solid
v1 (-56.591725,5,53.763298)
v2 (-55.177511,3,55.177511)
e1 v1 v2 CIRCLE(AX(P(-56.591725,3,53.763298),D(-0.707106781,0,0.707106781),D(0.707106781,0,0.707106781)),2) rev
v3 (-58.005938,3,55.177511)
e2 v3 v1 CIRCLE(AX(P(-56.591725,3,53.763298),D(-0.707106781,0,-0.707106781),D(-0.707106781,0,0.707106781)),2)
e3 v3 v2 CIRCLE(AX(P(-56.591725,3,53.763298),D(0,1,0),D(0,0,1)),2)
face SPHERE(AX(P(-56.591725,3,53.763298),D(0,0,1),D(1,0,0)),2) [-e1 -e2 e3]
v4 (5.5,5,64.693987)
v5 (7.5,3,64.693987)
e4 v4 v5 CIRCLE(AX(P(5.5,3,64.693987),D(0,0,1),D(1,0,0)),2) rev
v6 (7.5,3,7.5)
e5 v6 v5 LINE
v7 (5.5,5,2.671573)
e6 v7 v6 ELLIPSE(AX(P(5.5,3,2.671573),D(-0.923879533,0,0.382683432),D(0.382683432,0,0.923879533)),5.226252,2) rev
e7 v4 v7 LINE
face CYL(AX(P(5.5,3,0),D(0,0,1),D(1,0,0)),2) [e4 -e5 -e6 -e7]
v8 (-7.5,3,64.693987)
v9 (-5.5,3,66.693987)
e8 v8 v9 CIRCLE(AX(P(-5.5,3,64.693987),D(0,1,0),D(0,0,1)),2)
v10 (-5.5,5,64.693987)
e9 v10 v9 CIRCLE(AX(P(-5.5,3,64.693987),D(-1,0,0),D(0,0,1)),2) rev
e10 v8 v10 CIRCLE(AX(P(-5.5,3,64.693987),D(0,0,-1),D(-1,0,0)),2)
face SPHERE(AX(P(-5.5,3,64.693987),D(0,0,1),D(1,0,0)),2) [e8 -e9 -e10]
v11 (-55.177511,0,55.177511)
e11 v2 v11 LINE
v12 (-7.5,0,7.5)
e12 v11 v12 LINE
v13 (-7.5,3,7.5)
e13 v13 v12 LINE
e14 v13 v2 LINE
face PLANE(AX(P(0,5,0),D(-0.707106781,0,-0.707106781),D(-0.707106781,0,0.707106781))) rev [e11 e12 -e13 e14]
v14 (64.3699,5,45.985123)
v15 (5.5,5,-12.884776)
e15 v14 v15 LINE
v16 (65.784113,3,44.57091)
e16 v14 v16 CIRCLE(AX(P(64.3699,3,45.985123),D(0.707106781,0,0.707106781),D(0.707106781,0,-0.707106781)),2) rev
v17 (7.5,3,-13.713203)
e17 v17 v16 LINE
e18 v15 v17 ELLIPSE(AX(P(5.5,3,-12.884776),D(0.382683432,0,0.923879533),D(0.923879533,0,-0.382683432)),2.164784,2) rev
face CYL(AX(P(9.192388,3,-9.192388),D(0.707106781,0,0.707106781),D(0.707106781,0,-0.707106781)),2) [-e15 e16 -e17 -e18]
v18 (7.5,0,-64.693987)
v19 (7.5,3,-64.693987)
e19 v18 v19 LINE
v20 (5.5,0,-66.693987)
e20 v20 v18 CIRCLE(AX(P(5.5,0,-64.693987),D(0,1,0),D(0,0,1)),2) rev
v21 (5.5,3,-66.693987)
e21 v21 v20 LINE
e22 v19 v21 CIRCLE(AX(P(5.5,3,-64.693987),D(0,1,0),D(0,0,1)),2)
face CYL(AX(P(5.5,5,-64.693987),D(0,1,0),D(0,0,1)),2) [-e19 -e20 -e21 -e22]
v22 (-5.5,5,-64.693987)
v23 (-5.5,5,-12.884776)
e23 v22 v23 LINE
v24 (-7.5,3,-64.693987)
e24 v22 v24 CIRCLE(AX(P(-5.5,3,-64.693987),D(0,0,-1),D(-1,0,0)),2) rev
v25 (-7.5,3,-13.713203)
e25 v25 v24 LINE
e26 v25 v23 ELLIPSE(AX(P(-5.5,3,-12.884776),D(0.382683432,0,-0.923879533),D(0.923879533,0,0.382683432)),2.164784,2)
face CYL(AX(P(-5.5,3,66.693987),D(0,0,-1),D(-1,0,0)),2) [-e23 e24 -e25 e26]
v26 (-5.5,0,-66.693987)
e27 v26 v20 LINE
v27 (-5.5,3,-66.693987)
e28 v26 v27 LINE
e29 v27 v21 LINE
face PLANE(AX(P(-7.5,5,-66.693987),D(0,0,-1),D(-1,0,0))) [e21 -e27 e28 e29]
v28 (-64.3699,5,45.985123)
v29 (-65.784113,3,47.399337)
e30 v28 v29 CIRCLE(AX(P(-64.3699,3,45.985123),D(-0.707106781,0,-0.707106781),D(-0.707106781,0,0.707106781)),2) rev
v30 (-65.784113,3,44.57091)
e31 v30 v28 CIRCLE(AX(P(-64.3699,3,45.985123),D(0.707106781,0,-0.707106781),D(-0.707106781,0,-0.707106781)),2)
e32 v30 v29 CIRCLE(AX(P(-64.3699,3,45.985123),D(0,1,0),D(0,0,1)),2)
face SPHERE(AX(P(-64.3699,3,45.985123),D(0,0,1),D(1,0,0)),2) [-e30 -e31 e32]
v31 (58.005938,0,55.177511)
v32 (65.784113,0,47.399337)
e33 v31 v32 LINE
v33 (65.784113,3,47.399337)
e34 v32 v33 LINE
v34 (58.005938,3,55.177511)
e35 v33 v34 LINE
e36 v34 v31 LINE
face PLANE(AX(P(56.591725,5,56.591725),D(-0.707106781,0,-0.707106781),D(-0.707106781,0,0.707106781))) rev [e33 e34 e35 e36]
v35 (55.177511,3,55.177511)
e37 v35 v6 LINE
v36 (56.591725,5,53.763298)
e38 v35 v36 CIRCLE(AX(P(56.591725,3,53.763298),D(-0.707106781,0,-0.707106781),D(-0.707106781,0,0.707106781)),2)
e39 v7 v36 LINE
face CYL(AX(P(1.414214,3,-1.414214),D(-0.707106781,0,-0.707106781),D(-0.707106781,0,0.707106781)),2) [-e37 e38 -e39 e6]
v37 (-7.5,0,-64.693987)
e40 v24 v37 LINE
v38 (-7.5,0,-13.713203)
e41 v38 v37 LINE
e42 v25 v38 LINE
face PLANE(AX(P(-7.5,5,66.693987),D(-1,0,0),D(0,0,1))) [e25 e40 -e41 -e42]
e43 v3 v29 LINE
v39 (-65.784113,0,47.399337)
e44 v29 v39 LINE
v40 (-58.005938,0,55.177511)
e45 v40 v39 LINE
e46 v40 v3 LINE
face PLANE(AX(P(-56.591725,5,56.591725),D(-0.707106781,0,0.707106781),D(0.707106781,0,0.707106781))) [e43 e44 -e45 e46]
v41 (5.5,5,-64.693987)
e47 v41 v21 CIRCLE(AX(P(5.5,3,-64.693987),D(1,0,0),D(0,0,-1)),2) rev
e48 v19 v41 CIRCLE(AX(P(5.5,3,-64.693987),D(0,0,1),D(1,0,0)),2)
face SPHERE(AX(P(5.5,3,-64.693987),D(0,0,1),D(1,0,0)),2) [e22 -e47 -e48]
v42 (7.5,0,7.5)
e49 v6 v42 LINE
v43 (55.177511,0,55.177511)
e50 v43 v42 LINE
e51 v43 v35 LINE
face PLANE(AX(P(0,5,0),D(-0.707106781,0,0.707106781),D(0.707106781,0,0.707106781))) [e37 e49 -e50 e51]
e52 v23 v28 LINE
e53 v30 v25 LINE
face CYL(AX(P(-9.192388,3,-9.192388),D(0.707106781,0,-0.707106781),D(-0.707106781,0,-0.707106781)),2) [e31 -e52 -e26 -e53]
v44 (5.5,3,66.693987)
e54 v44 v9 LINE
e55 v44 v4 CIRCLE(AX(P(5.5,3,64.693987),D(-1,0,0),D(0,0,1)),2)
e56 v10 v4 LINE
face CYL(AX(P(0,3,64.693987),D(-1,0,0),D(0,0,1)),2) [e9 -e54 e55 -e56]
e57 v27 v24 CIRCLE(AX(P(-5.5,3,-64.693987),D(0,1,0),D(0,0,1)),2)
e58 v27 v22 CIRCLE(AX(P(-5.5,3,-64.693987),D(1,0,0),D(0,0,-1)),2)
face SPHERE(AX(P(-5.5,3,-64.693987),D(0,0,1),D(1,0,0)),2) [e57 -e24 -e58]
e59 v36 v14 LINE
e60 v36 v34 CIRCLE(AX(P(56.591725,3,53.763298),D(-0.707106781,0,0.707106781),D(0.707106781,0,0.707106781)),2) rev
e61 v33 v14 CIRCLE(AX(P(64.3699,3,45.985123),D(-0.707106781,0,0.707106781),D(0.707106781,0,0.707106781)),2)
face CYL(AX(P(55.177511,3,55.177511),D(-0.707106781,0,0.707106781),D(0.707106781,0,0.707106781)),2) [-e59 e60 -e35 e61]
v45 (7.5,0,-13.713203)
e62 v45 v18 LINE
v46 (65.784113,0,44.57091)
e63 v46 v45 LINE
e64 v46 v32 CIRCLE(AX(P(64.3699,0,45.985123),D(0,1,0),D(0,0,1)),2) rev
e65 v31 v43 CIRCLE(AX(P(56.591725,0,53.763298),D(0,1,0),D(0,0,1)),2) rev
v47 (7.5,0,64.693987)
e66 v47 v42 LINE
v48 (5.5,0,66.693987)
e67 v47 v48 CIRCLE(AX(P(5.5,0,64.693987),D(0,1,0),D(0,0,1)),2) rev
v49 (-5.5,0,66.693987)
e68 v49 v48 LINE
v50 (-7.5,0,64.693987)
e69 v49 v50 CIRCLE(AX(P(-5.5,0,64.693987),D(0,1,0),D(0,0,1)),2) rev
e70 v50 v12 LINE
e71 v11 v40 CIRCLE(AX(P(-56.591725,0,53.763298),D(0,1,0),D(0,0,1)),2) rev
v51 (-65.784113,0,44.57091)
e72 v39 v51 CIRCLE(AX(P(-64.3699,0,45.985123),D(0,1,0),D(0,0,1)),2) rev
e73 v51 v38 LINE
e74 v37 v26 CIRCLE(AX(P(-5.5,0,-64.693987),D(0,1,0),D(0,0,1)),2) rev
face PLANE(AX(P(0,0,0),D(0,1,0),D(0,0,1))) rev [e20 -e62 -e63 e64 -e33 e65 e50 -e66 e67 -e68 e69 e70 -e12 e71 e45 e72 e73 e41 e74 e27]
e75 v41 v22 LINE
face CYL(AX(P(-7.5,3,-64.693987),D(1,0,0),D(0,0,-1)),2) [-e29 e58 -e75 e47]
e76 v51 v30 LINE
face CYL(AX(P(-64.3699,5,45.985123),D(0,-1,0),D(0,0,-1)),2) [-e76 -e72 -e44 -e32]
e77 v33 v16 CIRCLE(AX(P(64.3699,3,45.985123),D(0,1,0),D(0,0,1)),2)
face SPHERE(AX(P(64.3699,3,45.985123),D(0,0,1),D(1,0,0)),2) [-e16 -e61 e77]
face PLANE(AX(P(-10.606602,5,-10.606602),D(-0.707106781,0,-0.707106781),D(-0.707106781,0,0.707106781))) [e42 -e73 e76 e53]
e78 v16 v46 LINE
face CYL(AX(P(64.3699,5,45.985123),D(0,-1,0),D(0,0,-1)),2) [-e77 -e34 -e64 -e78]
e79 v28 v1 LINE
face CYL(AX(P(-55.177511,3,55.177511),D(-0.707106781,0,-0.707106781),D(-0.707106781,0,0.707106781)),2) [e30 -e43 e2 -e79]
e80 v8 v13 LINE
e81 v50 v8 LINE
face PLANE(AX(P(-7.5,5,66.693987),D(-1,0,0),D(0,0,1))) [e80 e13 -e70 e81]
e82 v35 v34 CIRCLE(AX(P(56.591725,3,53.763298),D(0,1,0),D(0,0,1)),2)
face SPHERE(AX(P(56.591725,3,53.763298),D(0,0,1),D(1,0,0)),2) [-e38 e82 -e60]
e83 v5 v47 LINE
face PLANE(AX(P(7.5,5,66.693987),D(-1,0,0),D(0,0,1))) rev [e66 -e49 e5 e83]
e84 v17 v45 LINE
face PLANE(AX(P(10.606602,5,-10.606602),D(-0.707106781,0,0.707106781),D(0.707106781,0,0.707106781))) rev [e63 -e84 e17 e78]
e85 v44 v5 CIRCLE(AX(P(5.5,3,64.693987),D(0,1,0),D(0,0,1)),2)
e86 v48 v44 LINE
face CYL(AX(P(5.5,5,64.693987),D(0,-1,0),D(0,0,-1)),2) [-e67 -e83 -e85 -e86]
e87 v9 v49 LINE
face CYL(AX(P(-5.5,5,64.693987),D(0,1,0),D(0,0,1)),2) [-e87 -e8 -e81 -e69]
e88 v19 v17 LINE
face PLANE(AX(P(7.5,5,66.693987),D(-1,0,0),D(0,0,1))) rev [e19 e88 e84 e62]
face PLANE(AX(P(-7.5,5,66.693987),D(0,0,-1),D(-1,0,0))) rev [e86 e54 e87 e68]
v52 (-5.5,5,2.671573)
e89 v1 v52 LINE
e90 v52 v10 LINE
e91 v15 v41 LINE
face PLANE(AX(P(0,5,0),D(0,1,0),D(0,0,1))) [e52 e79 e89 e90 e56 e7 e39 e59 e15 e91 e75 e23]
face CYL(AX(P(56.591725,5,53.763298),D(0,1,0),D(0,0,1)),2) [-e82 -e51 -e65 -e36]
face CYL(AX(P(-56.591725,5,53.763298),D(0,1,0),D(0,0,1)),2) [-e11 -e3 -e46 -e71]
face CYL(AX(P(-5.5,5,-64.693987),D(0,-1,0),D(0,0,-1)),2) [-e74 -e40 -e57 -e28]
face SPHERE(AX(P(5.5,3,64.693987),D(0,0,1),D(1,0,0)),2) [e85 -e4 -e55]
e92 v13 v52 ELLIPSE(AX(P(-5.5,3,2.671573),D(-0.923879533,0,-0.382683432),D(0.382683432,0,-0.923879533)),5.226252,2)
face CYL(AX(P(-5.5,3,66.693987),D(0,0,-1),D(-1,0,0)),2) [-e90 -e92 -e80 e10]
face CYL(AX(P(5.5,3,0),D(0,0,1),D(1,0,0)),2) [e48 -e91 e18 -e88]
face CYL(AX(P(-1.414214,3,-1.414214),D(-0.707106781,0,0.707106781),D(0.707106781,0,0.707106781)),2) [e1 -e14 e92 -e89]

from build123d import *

# Parameters (mm, degrees)
SKETCH1_W           = 15
SKETCH1_H           = 133.387974866
BOSS_EXTRUDE4_DEPTH = 5
FILLET2_R           = 2
FILLET3_R           = 2


with BuildPart() as part:
    # Sketch1 → Boss-Extrude4 (new body)
    with BuildSketch(Plane(origin=(0, 0, 0), x_dir=(1, 0, 0), z_dir=(0, 1, 0))):
        Polygon((-56.591724934, -56.591724934), (-67.198326652, -45.985123216), (-4.122226718, 17.090976718), (6.484375, 6.484375), align=None)
        Rectangle(SKETCH1_W, SKETCH1_H)
        Polygon((56.591724934, -56.591724934), (67.198326652, -45.985123216), (3.579374214, 17.633829222), (-7.027227504, 7.027227504), align=None)
    extrude(amount=BOSS_EXTRUDE4_DEPTH)

    # Fillet2
    fillet2_edges = [part.edges().sort_by_distance(p)[0] for p in [
        (32.045862467, 5, 32.045862467),
        (-32.045862467, 5, 32.045862467),
        (-61.895025793, 5, 51.288424075),
        (-37.349163326, 5, 16.13595989),
        (-7.5, 5, 37.096993717),
        (-7.5, 5, -40.203595434),
        (0, 5, 66.693987433),
        (7.5, 5, 37.096993717),
        (7.5, 5, -40.203595434),
        (0, 5, -66.693987433),
        (61.895025793, 5, 51.288424075),
        (37.349163326, 5, 16.13595989),
    ]]
    fillet(fillet2_edges, radius=FILLET2_R)

    # Fillet3
    # the kernel refuses this fillet: 2 mm, written as the material it takes off along each edge
    with BuildSketch(Plane(origin=(-5.5, 3, 64.693987433), x_dir=(0, 0, 1), z_dir=(-1, 0, 0))) as fillet3_piece_1_section:
        Polygon((0, 0), (FILLET3_R, 0), (FILLET3_R, FILLET3_R), (0, FILLET3_R), align=None)
    fillet3_piece_1 = extrude(amount=FILLET3_R, mode=Mode.PRIVATE)
    fillet3_piece_1 = fillet3_piece_1 - Plane(origin=(-5.5, 3, 64.693987433), x_dir=(0, -0.7071067811865475, -0.7071067811865475), z_dir=(-1, 0, 0)) * Sphere(FILLET3_R, mode=Mode.PRIVATE)
    add(fillet3_piece_1, mode=Mode.SUBTRACT)
    with BuildSketch(Plane(origin=(5.5, 3, 64.693987433), x_dir=(0, 0, 1), z_dir=(1, 0, 0))) as fillet3_piece_2_section:
        Polygon((0, 0), (FILLET3_R, 0), (FILLET3_R, -FILLET3_R), (0, -FILLET3_R), align=None)
    fillet3_piece_2 = extrude(amount=FILLET3_R, mode=Mode.PRIVATE)
    fillet3_piece_2 = fillet3_piece_2 - Plane(origin=(5.5, 3, 64.693987433), x_dir=(0, -0.7071067811865475, -0.7071067811865475), z_dir=(1, 0, 0)) * Sphere(FILLET3_R, mode=Mode.PRIVATE)
    add(fillet3_piece_2, mode=Mode.SUBTRACT)
    with BuildSketch(Plane(origin=(-56.591724934, 3, 53.763297809), x_dir=(0.7071067811865437, 0, 0.7071067811865513), z_dir=(-0.7071067811865476, 0, 0.7071067811865476))) as fillet3_piece_3_section:
        Polygon((0, 0), (FILLET3_R, 0), (FILLET3_R, FILLET3_R), (0, FILLET3_R), align=None)
    fillet3_piece_3 = extrude(amount=FILLET3_R, mode=Mode.PRIVATE)
    fillet3_piece_3 = fillet3_piece_3 - Plane(origin=(-56.591724934, 3, 53.763297809), x_dir=(-0.4999999999999973, -0.7071067811865475, -0.5000000000000027), z_dir=(-0.7071067811865476, 0, 0.7071067811865476)) * Sphere(FILLET3_R, mode=Mode.PRIVATE)
    add(fillet3_piece_3, mode=Mode.SUBTRACT)
    with BuildSketch(Plane(origin=(56.591724934, 3, 53.763297809), x_dir=(-0.7071067811865476, 0, 0.7071067811865476), z_dir=(0.7071067811865479, 0, 0.7071067811865474))) as fillet3_piece_4_section:
        Polygon((0, 0), (FILLET3_R, 0), (FILLET3_R, -FILLET3_R), (0, -FILLET3_R), align=None)
    fillet3_piece_4 = extrude(amount=FILLET3_R, mode=Mode.PRIVATE)
    fillet3_piece_4 = fillet3_piece_4 - Plane(origin=(56.591724934, 3, 53.763297809), x_dir=(0.5, -0.7071067811865475, -0.5), z_dir=(0.7071067811865479, 0, 0.7071067811865474)) * Sphere(FILLET3_R, mode=Mode.PRIVATE)
    add(fillet3_piece_4, mode=Mode.SUBTRACT)
    with BuildSketch(Plane(origin=(-64.369899527, 3, 45.985123216), x_dir=(-0.7071067811865476, 0, -0.7071067811865476), z_dir=(-0.7071067811865476, 0, 0.7071067811865476))) as fillet3_piece_5_section:
        Polygon((0, 0), (FILLET3_R, 0), (FILLET3_R, -FILLET3_R), (0, -FILLET3_R), align=None)
    fillet3_piece_5 = extrude(amount=FILLET3_R, mode=Mode.PRIVATE)
    fillet3_piece_5 = fillet3_piece_5 - Plane(origin=(-64.369899527, 3, 45.985123216), x_dir=(0.5, -0.7071067811865475, 0.5), z_dir=(-0.7071067811865476, 0, 0.7071067811865476)) * Sphere(FILLET3_R, mode=Mode.PRIVATE)
    add(fillet3_piece_5, mode=Mode.SUBTRACT)
    with BuildSketch(Plane(origin=(64.369899527, 3, 45.985123216), x_dir=(0.7071067811865479, 0, 0.7071067811865474), z_dir=(0.7071067811865474, 0, -0.7071067811865478))) as fillet3_piece_6_section:
        Polygon((0, 0), (FILLET3_R, 0), (FILLET3_R, -FILLET3_R), (0, -FILLET3_R), align=None)
    fillet3_piece_6 = extrude(amount=FILLET3_R, mode=Mode.PRIVATE)
    fillet3_piece_6 = fillet3_piece_6 - Plane(origin=(64.369899527, 3, 45.985123216), x_dir=(-0.5000000000000002, -0.7071067811865475, -0.49999999999999983), z_dir=(0.7071067811865474, 0, -0.7071067811865478)) * Sphere(FILLET3_R, mode=Mode.PRIVATE)
    add(fillet3_piece_6, mode=Mode.SUBTRACT)
    with BuildSketch(Plane(origin=(-5.5, 3, -64.693987433), x_dir=(0, 0, -1), z_dir=(-1, 0, 0))) as fillet3_piece_7_section:
        Polygon((0, 0), (FILLET3_R, 0), (FILLET3_R, -FILLET3_R), (0, -FILLET3_R), align=None)
    fillet3_piece_7 = extrude(amount=FILLET3_R, mode=Mode.PRIVATE)
    fillet3_piece_7 = fillet3_piece_7 - Plane(origin=(-5.5, 3, -64.693987433), x_dir=(0, -0.7071067811865475, 0.7071067811865475), z_dir=(-1, 0, 0)) * Sphere(FILLET3_R, mode=Mode.PRIVATE)
    add(fillet3_piece_7, mode=Mode.SUBTRACT)
    with BuildSketch(Plane(origin=(5.5, 3, -64.693987433), x_dir=(1, 0, 0), z_dir=(0, 0, -1))) as fillet3_piece_8_section:
        Polygon((0, 0), (FILLET3_R, 0), (FILLET3_R, -FILLET3_R), (0, -FILLET3_R), align=None)
    fillet3_piece_8 = extrude(amount=FILLET3_R, mode=Mode.PRIVATE)
    fillet3_piece_8 = fillet3_piece_8 - Plane(origin=(5.5, 3, -64.693987433), x_dir=(-0.7071067811865475, -0.7071067811865475, 0), z_dir=(0, 0, -1)) * Sphere(FILLET3_R, mode=Mode.PRIVATE)
    add(fillet3_piece_8, mode=Mode.SUBTRACT)
    with BuildSketch(Plane(origin=(-7.5, -5, -66.693987433), x_dir=(0, 0, 1), z_dir=(0, 1, 0)), Plane(origin=(7.5, -5, -66.693987433), x_dir=(-1, 0, 0), z_dir=(0, 1, 0)), Plane(origin=(67.198326652, -5, 45.985123216), x_dir=(-0.7071067811865476, 0, -0.7071067811865476), z_dir=(0, 1, 0)), Plane(origin=(56.591724934, -5, 56.591724934), x_dir=(0.7071067811865476, 0, -0.7071067811865476), z_dir=(0, 1, 0)), Plane(origin=(7.5, -5, 66.693987433), x_dir=(0, 0, -1), z_dir=(0, 1, 0)), Plane(origin=(-67.198326652, -5, 45.985123216), x_dir=(0.7071067811865476, 0, 0.7071067811865476), z_dir=(0, 1, 0))) as fillet3_piece_9:
        with BuildLine():
            CenterArc((FILLET3_R, FILLET3_R), FILLET3_R, 180, 90)
            Line((0, FILLET3_R), (0, 0))
            Line((0, 0), (FILLET3_R, 0))
        make_face()
    extrude(amount=8, mode=Mode.SUBTRACT)
    with BuildSketch(Plane(origin=(-7.5, -5, 66.693987433), x_dir=(0, 0, -1), z_dir=(0, 1, 0)), Plane(origin=(-56.591724934, -5, 56.591724934), x_dir=(-0.7071067811865476, 0, -0.7071067811865476), z_dir=(0, 1, 0))) as fillet3_piece_10:
        with BuildLine():
            CenterArc((FILLET3_R, -FILLET3_R), FILLET3_R, 90, 90)
            Line((0, -FILLET3_R), (0, 0))
            Line((0, 0), (FILLET3_R, 0))
        make_face()
    extrude(amount=8, mode=Mode.SUBTRACT)


solid = part.part
